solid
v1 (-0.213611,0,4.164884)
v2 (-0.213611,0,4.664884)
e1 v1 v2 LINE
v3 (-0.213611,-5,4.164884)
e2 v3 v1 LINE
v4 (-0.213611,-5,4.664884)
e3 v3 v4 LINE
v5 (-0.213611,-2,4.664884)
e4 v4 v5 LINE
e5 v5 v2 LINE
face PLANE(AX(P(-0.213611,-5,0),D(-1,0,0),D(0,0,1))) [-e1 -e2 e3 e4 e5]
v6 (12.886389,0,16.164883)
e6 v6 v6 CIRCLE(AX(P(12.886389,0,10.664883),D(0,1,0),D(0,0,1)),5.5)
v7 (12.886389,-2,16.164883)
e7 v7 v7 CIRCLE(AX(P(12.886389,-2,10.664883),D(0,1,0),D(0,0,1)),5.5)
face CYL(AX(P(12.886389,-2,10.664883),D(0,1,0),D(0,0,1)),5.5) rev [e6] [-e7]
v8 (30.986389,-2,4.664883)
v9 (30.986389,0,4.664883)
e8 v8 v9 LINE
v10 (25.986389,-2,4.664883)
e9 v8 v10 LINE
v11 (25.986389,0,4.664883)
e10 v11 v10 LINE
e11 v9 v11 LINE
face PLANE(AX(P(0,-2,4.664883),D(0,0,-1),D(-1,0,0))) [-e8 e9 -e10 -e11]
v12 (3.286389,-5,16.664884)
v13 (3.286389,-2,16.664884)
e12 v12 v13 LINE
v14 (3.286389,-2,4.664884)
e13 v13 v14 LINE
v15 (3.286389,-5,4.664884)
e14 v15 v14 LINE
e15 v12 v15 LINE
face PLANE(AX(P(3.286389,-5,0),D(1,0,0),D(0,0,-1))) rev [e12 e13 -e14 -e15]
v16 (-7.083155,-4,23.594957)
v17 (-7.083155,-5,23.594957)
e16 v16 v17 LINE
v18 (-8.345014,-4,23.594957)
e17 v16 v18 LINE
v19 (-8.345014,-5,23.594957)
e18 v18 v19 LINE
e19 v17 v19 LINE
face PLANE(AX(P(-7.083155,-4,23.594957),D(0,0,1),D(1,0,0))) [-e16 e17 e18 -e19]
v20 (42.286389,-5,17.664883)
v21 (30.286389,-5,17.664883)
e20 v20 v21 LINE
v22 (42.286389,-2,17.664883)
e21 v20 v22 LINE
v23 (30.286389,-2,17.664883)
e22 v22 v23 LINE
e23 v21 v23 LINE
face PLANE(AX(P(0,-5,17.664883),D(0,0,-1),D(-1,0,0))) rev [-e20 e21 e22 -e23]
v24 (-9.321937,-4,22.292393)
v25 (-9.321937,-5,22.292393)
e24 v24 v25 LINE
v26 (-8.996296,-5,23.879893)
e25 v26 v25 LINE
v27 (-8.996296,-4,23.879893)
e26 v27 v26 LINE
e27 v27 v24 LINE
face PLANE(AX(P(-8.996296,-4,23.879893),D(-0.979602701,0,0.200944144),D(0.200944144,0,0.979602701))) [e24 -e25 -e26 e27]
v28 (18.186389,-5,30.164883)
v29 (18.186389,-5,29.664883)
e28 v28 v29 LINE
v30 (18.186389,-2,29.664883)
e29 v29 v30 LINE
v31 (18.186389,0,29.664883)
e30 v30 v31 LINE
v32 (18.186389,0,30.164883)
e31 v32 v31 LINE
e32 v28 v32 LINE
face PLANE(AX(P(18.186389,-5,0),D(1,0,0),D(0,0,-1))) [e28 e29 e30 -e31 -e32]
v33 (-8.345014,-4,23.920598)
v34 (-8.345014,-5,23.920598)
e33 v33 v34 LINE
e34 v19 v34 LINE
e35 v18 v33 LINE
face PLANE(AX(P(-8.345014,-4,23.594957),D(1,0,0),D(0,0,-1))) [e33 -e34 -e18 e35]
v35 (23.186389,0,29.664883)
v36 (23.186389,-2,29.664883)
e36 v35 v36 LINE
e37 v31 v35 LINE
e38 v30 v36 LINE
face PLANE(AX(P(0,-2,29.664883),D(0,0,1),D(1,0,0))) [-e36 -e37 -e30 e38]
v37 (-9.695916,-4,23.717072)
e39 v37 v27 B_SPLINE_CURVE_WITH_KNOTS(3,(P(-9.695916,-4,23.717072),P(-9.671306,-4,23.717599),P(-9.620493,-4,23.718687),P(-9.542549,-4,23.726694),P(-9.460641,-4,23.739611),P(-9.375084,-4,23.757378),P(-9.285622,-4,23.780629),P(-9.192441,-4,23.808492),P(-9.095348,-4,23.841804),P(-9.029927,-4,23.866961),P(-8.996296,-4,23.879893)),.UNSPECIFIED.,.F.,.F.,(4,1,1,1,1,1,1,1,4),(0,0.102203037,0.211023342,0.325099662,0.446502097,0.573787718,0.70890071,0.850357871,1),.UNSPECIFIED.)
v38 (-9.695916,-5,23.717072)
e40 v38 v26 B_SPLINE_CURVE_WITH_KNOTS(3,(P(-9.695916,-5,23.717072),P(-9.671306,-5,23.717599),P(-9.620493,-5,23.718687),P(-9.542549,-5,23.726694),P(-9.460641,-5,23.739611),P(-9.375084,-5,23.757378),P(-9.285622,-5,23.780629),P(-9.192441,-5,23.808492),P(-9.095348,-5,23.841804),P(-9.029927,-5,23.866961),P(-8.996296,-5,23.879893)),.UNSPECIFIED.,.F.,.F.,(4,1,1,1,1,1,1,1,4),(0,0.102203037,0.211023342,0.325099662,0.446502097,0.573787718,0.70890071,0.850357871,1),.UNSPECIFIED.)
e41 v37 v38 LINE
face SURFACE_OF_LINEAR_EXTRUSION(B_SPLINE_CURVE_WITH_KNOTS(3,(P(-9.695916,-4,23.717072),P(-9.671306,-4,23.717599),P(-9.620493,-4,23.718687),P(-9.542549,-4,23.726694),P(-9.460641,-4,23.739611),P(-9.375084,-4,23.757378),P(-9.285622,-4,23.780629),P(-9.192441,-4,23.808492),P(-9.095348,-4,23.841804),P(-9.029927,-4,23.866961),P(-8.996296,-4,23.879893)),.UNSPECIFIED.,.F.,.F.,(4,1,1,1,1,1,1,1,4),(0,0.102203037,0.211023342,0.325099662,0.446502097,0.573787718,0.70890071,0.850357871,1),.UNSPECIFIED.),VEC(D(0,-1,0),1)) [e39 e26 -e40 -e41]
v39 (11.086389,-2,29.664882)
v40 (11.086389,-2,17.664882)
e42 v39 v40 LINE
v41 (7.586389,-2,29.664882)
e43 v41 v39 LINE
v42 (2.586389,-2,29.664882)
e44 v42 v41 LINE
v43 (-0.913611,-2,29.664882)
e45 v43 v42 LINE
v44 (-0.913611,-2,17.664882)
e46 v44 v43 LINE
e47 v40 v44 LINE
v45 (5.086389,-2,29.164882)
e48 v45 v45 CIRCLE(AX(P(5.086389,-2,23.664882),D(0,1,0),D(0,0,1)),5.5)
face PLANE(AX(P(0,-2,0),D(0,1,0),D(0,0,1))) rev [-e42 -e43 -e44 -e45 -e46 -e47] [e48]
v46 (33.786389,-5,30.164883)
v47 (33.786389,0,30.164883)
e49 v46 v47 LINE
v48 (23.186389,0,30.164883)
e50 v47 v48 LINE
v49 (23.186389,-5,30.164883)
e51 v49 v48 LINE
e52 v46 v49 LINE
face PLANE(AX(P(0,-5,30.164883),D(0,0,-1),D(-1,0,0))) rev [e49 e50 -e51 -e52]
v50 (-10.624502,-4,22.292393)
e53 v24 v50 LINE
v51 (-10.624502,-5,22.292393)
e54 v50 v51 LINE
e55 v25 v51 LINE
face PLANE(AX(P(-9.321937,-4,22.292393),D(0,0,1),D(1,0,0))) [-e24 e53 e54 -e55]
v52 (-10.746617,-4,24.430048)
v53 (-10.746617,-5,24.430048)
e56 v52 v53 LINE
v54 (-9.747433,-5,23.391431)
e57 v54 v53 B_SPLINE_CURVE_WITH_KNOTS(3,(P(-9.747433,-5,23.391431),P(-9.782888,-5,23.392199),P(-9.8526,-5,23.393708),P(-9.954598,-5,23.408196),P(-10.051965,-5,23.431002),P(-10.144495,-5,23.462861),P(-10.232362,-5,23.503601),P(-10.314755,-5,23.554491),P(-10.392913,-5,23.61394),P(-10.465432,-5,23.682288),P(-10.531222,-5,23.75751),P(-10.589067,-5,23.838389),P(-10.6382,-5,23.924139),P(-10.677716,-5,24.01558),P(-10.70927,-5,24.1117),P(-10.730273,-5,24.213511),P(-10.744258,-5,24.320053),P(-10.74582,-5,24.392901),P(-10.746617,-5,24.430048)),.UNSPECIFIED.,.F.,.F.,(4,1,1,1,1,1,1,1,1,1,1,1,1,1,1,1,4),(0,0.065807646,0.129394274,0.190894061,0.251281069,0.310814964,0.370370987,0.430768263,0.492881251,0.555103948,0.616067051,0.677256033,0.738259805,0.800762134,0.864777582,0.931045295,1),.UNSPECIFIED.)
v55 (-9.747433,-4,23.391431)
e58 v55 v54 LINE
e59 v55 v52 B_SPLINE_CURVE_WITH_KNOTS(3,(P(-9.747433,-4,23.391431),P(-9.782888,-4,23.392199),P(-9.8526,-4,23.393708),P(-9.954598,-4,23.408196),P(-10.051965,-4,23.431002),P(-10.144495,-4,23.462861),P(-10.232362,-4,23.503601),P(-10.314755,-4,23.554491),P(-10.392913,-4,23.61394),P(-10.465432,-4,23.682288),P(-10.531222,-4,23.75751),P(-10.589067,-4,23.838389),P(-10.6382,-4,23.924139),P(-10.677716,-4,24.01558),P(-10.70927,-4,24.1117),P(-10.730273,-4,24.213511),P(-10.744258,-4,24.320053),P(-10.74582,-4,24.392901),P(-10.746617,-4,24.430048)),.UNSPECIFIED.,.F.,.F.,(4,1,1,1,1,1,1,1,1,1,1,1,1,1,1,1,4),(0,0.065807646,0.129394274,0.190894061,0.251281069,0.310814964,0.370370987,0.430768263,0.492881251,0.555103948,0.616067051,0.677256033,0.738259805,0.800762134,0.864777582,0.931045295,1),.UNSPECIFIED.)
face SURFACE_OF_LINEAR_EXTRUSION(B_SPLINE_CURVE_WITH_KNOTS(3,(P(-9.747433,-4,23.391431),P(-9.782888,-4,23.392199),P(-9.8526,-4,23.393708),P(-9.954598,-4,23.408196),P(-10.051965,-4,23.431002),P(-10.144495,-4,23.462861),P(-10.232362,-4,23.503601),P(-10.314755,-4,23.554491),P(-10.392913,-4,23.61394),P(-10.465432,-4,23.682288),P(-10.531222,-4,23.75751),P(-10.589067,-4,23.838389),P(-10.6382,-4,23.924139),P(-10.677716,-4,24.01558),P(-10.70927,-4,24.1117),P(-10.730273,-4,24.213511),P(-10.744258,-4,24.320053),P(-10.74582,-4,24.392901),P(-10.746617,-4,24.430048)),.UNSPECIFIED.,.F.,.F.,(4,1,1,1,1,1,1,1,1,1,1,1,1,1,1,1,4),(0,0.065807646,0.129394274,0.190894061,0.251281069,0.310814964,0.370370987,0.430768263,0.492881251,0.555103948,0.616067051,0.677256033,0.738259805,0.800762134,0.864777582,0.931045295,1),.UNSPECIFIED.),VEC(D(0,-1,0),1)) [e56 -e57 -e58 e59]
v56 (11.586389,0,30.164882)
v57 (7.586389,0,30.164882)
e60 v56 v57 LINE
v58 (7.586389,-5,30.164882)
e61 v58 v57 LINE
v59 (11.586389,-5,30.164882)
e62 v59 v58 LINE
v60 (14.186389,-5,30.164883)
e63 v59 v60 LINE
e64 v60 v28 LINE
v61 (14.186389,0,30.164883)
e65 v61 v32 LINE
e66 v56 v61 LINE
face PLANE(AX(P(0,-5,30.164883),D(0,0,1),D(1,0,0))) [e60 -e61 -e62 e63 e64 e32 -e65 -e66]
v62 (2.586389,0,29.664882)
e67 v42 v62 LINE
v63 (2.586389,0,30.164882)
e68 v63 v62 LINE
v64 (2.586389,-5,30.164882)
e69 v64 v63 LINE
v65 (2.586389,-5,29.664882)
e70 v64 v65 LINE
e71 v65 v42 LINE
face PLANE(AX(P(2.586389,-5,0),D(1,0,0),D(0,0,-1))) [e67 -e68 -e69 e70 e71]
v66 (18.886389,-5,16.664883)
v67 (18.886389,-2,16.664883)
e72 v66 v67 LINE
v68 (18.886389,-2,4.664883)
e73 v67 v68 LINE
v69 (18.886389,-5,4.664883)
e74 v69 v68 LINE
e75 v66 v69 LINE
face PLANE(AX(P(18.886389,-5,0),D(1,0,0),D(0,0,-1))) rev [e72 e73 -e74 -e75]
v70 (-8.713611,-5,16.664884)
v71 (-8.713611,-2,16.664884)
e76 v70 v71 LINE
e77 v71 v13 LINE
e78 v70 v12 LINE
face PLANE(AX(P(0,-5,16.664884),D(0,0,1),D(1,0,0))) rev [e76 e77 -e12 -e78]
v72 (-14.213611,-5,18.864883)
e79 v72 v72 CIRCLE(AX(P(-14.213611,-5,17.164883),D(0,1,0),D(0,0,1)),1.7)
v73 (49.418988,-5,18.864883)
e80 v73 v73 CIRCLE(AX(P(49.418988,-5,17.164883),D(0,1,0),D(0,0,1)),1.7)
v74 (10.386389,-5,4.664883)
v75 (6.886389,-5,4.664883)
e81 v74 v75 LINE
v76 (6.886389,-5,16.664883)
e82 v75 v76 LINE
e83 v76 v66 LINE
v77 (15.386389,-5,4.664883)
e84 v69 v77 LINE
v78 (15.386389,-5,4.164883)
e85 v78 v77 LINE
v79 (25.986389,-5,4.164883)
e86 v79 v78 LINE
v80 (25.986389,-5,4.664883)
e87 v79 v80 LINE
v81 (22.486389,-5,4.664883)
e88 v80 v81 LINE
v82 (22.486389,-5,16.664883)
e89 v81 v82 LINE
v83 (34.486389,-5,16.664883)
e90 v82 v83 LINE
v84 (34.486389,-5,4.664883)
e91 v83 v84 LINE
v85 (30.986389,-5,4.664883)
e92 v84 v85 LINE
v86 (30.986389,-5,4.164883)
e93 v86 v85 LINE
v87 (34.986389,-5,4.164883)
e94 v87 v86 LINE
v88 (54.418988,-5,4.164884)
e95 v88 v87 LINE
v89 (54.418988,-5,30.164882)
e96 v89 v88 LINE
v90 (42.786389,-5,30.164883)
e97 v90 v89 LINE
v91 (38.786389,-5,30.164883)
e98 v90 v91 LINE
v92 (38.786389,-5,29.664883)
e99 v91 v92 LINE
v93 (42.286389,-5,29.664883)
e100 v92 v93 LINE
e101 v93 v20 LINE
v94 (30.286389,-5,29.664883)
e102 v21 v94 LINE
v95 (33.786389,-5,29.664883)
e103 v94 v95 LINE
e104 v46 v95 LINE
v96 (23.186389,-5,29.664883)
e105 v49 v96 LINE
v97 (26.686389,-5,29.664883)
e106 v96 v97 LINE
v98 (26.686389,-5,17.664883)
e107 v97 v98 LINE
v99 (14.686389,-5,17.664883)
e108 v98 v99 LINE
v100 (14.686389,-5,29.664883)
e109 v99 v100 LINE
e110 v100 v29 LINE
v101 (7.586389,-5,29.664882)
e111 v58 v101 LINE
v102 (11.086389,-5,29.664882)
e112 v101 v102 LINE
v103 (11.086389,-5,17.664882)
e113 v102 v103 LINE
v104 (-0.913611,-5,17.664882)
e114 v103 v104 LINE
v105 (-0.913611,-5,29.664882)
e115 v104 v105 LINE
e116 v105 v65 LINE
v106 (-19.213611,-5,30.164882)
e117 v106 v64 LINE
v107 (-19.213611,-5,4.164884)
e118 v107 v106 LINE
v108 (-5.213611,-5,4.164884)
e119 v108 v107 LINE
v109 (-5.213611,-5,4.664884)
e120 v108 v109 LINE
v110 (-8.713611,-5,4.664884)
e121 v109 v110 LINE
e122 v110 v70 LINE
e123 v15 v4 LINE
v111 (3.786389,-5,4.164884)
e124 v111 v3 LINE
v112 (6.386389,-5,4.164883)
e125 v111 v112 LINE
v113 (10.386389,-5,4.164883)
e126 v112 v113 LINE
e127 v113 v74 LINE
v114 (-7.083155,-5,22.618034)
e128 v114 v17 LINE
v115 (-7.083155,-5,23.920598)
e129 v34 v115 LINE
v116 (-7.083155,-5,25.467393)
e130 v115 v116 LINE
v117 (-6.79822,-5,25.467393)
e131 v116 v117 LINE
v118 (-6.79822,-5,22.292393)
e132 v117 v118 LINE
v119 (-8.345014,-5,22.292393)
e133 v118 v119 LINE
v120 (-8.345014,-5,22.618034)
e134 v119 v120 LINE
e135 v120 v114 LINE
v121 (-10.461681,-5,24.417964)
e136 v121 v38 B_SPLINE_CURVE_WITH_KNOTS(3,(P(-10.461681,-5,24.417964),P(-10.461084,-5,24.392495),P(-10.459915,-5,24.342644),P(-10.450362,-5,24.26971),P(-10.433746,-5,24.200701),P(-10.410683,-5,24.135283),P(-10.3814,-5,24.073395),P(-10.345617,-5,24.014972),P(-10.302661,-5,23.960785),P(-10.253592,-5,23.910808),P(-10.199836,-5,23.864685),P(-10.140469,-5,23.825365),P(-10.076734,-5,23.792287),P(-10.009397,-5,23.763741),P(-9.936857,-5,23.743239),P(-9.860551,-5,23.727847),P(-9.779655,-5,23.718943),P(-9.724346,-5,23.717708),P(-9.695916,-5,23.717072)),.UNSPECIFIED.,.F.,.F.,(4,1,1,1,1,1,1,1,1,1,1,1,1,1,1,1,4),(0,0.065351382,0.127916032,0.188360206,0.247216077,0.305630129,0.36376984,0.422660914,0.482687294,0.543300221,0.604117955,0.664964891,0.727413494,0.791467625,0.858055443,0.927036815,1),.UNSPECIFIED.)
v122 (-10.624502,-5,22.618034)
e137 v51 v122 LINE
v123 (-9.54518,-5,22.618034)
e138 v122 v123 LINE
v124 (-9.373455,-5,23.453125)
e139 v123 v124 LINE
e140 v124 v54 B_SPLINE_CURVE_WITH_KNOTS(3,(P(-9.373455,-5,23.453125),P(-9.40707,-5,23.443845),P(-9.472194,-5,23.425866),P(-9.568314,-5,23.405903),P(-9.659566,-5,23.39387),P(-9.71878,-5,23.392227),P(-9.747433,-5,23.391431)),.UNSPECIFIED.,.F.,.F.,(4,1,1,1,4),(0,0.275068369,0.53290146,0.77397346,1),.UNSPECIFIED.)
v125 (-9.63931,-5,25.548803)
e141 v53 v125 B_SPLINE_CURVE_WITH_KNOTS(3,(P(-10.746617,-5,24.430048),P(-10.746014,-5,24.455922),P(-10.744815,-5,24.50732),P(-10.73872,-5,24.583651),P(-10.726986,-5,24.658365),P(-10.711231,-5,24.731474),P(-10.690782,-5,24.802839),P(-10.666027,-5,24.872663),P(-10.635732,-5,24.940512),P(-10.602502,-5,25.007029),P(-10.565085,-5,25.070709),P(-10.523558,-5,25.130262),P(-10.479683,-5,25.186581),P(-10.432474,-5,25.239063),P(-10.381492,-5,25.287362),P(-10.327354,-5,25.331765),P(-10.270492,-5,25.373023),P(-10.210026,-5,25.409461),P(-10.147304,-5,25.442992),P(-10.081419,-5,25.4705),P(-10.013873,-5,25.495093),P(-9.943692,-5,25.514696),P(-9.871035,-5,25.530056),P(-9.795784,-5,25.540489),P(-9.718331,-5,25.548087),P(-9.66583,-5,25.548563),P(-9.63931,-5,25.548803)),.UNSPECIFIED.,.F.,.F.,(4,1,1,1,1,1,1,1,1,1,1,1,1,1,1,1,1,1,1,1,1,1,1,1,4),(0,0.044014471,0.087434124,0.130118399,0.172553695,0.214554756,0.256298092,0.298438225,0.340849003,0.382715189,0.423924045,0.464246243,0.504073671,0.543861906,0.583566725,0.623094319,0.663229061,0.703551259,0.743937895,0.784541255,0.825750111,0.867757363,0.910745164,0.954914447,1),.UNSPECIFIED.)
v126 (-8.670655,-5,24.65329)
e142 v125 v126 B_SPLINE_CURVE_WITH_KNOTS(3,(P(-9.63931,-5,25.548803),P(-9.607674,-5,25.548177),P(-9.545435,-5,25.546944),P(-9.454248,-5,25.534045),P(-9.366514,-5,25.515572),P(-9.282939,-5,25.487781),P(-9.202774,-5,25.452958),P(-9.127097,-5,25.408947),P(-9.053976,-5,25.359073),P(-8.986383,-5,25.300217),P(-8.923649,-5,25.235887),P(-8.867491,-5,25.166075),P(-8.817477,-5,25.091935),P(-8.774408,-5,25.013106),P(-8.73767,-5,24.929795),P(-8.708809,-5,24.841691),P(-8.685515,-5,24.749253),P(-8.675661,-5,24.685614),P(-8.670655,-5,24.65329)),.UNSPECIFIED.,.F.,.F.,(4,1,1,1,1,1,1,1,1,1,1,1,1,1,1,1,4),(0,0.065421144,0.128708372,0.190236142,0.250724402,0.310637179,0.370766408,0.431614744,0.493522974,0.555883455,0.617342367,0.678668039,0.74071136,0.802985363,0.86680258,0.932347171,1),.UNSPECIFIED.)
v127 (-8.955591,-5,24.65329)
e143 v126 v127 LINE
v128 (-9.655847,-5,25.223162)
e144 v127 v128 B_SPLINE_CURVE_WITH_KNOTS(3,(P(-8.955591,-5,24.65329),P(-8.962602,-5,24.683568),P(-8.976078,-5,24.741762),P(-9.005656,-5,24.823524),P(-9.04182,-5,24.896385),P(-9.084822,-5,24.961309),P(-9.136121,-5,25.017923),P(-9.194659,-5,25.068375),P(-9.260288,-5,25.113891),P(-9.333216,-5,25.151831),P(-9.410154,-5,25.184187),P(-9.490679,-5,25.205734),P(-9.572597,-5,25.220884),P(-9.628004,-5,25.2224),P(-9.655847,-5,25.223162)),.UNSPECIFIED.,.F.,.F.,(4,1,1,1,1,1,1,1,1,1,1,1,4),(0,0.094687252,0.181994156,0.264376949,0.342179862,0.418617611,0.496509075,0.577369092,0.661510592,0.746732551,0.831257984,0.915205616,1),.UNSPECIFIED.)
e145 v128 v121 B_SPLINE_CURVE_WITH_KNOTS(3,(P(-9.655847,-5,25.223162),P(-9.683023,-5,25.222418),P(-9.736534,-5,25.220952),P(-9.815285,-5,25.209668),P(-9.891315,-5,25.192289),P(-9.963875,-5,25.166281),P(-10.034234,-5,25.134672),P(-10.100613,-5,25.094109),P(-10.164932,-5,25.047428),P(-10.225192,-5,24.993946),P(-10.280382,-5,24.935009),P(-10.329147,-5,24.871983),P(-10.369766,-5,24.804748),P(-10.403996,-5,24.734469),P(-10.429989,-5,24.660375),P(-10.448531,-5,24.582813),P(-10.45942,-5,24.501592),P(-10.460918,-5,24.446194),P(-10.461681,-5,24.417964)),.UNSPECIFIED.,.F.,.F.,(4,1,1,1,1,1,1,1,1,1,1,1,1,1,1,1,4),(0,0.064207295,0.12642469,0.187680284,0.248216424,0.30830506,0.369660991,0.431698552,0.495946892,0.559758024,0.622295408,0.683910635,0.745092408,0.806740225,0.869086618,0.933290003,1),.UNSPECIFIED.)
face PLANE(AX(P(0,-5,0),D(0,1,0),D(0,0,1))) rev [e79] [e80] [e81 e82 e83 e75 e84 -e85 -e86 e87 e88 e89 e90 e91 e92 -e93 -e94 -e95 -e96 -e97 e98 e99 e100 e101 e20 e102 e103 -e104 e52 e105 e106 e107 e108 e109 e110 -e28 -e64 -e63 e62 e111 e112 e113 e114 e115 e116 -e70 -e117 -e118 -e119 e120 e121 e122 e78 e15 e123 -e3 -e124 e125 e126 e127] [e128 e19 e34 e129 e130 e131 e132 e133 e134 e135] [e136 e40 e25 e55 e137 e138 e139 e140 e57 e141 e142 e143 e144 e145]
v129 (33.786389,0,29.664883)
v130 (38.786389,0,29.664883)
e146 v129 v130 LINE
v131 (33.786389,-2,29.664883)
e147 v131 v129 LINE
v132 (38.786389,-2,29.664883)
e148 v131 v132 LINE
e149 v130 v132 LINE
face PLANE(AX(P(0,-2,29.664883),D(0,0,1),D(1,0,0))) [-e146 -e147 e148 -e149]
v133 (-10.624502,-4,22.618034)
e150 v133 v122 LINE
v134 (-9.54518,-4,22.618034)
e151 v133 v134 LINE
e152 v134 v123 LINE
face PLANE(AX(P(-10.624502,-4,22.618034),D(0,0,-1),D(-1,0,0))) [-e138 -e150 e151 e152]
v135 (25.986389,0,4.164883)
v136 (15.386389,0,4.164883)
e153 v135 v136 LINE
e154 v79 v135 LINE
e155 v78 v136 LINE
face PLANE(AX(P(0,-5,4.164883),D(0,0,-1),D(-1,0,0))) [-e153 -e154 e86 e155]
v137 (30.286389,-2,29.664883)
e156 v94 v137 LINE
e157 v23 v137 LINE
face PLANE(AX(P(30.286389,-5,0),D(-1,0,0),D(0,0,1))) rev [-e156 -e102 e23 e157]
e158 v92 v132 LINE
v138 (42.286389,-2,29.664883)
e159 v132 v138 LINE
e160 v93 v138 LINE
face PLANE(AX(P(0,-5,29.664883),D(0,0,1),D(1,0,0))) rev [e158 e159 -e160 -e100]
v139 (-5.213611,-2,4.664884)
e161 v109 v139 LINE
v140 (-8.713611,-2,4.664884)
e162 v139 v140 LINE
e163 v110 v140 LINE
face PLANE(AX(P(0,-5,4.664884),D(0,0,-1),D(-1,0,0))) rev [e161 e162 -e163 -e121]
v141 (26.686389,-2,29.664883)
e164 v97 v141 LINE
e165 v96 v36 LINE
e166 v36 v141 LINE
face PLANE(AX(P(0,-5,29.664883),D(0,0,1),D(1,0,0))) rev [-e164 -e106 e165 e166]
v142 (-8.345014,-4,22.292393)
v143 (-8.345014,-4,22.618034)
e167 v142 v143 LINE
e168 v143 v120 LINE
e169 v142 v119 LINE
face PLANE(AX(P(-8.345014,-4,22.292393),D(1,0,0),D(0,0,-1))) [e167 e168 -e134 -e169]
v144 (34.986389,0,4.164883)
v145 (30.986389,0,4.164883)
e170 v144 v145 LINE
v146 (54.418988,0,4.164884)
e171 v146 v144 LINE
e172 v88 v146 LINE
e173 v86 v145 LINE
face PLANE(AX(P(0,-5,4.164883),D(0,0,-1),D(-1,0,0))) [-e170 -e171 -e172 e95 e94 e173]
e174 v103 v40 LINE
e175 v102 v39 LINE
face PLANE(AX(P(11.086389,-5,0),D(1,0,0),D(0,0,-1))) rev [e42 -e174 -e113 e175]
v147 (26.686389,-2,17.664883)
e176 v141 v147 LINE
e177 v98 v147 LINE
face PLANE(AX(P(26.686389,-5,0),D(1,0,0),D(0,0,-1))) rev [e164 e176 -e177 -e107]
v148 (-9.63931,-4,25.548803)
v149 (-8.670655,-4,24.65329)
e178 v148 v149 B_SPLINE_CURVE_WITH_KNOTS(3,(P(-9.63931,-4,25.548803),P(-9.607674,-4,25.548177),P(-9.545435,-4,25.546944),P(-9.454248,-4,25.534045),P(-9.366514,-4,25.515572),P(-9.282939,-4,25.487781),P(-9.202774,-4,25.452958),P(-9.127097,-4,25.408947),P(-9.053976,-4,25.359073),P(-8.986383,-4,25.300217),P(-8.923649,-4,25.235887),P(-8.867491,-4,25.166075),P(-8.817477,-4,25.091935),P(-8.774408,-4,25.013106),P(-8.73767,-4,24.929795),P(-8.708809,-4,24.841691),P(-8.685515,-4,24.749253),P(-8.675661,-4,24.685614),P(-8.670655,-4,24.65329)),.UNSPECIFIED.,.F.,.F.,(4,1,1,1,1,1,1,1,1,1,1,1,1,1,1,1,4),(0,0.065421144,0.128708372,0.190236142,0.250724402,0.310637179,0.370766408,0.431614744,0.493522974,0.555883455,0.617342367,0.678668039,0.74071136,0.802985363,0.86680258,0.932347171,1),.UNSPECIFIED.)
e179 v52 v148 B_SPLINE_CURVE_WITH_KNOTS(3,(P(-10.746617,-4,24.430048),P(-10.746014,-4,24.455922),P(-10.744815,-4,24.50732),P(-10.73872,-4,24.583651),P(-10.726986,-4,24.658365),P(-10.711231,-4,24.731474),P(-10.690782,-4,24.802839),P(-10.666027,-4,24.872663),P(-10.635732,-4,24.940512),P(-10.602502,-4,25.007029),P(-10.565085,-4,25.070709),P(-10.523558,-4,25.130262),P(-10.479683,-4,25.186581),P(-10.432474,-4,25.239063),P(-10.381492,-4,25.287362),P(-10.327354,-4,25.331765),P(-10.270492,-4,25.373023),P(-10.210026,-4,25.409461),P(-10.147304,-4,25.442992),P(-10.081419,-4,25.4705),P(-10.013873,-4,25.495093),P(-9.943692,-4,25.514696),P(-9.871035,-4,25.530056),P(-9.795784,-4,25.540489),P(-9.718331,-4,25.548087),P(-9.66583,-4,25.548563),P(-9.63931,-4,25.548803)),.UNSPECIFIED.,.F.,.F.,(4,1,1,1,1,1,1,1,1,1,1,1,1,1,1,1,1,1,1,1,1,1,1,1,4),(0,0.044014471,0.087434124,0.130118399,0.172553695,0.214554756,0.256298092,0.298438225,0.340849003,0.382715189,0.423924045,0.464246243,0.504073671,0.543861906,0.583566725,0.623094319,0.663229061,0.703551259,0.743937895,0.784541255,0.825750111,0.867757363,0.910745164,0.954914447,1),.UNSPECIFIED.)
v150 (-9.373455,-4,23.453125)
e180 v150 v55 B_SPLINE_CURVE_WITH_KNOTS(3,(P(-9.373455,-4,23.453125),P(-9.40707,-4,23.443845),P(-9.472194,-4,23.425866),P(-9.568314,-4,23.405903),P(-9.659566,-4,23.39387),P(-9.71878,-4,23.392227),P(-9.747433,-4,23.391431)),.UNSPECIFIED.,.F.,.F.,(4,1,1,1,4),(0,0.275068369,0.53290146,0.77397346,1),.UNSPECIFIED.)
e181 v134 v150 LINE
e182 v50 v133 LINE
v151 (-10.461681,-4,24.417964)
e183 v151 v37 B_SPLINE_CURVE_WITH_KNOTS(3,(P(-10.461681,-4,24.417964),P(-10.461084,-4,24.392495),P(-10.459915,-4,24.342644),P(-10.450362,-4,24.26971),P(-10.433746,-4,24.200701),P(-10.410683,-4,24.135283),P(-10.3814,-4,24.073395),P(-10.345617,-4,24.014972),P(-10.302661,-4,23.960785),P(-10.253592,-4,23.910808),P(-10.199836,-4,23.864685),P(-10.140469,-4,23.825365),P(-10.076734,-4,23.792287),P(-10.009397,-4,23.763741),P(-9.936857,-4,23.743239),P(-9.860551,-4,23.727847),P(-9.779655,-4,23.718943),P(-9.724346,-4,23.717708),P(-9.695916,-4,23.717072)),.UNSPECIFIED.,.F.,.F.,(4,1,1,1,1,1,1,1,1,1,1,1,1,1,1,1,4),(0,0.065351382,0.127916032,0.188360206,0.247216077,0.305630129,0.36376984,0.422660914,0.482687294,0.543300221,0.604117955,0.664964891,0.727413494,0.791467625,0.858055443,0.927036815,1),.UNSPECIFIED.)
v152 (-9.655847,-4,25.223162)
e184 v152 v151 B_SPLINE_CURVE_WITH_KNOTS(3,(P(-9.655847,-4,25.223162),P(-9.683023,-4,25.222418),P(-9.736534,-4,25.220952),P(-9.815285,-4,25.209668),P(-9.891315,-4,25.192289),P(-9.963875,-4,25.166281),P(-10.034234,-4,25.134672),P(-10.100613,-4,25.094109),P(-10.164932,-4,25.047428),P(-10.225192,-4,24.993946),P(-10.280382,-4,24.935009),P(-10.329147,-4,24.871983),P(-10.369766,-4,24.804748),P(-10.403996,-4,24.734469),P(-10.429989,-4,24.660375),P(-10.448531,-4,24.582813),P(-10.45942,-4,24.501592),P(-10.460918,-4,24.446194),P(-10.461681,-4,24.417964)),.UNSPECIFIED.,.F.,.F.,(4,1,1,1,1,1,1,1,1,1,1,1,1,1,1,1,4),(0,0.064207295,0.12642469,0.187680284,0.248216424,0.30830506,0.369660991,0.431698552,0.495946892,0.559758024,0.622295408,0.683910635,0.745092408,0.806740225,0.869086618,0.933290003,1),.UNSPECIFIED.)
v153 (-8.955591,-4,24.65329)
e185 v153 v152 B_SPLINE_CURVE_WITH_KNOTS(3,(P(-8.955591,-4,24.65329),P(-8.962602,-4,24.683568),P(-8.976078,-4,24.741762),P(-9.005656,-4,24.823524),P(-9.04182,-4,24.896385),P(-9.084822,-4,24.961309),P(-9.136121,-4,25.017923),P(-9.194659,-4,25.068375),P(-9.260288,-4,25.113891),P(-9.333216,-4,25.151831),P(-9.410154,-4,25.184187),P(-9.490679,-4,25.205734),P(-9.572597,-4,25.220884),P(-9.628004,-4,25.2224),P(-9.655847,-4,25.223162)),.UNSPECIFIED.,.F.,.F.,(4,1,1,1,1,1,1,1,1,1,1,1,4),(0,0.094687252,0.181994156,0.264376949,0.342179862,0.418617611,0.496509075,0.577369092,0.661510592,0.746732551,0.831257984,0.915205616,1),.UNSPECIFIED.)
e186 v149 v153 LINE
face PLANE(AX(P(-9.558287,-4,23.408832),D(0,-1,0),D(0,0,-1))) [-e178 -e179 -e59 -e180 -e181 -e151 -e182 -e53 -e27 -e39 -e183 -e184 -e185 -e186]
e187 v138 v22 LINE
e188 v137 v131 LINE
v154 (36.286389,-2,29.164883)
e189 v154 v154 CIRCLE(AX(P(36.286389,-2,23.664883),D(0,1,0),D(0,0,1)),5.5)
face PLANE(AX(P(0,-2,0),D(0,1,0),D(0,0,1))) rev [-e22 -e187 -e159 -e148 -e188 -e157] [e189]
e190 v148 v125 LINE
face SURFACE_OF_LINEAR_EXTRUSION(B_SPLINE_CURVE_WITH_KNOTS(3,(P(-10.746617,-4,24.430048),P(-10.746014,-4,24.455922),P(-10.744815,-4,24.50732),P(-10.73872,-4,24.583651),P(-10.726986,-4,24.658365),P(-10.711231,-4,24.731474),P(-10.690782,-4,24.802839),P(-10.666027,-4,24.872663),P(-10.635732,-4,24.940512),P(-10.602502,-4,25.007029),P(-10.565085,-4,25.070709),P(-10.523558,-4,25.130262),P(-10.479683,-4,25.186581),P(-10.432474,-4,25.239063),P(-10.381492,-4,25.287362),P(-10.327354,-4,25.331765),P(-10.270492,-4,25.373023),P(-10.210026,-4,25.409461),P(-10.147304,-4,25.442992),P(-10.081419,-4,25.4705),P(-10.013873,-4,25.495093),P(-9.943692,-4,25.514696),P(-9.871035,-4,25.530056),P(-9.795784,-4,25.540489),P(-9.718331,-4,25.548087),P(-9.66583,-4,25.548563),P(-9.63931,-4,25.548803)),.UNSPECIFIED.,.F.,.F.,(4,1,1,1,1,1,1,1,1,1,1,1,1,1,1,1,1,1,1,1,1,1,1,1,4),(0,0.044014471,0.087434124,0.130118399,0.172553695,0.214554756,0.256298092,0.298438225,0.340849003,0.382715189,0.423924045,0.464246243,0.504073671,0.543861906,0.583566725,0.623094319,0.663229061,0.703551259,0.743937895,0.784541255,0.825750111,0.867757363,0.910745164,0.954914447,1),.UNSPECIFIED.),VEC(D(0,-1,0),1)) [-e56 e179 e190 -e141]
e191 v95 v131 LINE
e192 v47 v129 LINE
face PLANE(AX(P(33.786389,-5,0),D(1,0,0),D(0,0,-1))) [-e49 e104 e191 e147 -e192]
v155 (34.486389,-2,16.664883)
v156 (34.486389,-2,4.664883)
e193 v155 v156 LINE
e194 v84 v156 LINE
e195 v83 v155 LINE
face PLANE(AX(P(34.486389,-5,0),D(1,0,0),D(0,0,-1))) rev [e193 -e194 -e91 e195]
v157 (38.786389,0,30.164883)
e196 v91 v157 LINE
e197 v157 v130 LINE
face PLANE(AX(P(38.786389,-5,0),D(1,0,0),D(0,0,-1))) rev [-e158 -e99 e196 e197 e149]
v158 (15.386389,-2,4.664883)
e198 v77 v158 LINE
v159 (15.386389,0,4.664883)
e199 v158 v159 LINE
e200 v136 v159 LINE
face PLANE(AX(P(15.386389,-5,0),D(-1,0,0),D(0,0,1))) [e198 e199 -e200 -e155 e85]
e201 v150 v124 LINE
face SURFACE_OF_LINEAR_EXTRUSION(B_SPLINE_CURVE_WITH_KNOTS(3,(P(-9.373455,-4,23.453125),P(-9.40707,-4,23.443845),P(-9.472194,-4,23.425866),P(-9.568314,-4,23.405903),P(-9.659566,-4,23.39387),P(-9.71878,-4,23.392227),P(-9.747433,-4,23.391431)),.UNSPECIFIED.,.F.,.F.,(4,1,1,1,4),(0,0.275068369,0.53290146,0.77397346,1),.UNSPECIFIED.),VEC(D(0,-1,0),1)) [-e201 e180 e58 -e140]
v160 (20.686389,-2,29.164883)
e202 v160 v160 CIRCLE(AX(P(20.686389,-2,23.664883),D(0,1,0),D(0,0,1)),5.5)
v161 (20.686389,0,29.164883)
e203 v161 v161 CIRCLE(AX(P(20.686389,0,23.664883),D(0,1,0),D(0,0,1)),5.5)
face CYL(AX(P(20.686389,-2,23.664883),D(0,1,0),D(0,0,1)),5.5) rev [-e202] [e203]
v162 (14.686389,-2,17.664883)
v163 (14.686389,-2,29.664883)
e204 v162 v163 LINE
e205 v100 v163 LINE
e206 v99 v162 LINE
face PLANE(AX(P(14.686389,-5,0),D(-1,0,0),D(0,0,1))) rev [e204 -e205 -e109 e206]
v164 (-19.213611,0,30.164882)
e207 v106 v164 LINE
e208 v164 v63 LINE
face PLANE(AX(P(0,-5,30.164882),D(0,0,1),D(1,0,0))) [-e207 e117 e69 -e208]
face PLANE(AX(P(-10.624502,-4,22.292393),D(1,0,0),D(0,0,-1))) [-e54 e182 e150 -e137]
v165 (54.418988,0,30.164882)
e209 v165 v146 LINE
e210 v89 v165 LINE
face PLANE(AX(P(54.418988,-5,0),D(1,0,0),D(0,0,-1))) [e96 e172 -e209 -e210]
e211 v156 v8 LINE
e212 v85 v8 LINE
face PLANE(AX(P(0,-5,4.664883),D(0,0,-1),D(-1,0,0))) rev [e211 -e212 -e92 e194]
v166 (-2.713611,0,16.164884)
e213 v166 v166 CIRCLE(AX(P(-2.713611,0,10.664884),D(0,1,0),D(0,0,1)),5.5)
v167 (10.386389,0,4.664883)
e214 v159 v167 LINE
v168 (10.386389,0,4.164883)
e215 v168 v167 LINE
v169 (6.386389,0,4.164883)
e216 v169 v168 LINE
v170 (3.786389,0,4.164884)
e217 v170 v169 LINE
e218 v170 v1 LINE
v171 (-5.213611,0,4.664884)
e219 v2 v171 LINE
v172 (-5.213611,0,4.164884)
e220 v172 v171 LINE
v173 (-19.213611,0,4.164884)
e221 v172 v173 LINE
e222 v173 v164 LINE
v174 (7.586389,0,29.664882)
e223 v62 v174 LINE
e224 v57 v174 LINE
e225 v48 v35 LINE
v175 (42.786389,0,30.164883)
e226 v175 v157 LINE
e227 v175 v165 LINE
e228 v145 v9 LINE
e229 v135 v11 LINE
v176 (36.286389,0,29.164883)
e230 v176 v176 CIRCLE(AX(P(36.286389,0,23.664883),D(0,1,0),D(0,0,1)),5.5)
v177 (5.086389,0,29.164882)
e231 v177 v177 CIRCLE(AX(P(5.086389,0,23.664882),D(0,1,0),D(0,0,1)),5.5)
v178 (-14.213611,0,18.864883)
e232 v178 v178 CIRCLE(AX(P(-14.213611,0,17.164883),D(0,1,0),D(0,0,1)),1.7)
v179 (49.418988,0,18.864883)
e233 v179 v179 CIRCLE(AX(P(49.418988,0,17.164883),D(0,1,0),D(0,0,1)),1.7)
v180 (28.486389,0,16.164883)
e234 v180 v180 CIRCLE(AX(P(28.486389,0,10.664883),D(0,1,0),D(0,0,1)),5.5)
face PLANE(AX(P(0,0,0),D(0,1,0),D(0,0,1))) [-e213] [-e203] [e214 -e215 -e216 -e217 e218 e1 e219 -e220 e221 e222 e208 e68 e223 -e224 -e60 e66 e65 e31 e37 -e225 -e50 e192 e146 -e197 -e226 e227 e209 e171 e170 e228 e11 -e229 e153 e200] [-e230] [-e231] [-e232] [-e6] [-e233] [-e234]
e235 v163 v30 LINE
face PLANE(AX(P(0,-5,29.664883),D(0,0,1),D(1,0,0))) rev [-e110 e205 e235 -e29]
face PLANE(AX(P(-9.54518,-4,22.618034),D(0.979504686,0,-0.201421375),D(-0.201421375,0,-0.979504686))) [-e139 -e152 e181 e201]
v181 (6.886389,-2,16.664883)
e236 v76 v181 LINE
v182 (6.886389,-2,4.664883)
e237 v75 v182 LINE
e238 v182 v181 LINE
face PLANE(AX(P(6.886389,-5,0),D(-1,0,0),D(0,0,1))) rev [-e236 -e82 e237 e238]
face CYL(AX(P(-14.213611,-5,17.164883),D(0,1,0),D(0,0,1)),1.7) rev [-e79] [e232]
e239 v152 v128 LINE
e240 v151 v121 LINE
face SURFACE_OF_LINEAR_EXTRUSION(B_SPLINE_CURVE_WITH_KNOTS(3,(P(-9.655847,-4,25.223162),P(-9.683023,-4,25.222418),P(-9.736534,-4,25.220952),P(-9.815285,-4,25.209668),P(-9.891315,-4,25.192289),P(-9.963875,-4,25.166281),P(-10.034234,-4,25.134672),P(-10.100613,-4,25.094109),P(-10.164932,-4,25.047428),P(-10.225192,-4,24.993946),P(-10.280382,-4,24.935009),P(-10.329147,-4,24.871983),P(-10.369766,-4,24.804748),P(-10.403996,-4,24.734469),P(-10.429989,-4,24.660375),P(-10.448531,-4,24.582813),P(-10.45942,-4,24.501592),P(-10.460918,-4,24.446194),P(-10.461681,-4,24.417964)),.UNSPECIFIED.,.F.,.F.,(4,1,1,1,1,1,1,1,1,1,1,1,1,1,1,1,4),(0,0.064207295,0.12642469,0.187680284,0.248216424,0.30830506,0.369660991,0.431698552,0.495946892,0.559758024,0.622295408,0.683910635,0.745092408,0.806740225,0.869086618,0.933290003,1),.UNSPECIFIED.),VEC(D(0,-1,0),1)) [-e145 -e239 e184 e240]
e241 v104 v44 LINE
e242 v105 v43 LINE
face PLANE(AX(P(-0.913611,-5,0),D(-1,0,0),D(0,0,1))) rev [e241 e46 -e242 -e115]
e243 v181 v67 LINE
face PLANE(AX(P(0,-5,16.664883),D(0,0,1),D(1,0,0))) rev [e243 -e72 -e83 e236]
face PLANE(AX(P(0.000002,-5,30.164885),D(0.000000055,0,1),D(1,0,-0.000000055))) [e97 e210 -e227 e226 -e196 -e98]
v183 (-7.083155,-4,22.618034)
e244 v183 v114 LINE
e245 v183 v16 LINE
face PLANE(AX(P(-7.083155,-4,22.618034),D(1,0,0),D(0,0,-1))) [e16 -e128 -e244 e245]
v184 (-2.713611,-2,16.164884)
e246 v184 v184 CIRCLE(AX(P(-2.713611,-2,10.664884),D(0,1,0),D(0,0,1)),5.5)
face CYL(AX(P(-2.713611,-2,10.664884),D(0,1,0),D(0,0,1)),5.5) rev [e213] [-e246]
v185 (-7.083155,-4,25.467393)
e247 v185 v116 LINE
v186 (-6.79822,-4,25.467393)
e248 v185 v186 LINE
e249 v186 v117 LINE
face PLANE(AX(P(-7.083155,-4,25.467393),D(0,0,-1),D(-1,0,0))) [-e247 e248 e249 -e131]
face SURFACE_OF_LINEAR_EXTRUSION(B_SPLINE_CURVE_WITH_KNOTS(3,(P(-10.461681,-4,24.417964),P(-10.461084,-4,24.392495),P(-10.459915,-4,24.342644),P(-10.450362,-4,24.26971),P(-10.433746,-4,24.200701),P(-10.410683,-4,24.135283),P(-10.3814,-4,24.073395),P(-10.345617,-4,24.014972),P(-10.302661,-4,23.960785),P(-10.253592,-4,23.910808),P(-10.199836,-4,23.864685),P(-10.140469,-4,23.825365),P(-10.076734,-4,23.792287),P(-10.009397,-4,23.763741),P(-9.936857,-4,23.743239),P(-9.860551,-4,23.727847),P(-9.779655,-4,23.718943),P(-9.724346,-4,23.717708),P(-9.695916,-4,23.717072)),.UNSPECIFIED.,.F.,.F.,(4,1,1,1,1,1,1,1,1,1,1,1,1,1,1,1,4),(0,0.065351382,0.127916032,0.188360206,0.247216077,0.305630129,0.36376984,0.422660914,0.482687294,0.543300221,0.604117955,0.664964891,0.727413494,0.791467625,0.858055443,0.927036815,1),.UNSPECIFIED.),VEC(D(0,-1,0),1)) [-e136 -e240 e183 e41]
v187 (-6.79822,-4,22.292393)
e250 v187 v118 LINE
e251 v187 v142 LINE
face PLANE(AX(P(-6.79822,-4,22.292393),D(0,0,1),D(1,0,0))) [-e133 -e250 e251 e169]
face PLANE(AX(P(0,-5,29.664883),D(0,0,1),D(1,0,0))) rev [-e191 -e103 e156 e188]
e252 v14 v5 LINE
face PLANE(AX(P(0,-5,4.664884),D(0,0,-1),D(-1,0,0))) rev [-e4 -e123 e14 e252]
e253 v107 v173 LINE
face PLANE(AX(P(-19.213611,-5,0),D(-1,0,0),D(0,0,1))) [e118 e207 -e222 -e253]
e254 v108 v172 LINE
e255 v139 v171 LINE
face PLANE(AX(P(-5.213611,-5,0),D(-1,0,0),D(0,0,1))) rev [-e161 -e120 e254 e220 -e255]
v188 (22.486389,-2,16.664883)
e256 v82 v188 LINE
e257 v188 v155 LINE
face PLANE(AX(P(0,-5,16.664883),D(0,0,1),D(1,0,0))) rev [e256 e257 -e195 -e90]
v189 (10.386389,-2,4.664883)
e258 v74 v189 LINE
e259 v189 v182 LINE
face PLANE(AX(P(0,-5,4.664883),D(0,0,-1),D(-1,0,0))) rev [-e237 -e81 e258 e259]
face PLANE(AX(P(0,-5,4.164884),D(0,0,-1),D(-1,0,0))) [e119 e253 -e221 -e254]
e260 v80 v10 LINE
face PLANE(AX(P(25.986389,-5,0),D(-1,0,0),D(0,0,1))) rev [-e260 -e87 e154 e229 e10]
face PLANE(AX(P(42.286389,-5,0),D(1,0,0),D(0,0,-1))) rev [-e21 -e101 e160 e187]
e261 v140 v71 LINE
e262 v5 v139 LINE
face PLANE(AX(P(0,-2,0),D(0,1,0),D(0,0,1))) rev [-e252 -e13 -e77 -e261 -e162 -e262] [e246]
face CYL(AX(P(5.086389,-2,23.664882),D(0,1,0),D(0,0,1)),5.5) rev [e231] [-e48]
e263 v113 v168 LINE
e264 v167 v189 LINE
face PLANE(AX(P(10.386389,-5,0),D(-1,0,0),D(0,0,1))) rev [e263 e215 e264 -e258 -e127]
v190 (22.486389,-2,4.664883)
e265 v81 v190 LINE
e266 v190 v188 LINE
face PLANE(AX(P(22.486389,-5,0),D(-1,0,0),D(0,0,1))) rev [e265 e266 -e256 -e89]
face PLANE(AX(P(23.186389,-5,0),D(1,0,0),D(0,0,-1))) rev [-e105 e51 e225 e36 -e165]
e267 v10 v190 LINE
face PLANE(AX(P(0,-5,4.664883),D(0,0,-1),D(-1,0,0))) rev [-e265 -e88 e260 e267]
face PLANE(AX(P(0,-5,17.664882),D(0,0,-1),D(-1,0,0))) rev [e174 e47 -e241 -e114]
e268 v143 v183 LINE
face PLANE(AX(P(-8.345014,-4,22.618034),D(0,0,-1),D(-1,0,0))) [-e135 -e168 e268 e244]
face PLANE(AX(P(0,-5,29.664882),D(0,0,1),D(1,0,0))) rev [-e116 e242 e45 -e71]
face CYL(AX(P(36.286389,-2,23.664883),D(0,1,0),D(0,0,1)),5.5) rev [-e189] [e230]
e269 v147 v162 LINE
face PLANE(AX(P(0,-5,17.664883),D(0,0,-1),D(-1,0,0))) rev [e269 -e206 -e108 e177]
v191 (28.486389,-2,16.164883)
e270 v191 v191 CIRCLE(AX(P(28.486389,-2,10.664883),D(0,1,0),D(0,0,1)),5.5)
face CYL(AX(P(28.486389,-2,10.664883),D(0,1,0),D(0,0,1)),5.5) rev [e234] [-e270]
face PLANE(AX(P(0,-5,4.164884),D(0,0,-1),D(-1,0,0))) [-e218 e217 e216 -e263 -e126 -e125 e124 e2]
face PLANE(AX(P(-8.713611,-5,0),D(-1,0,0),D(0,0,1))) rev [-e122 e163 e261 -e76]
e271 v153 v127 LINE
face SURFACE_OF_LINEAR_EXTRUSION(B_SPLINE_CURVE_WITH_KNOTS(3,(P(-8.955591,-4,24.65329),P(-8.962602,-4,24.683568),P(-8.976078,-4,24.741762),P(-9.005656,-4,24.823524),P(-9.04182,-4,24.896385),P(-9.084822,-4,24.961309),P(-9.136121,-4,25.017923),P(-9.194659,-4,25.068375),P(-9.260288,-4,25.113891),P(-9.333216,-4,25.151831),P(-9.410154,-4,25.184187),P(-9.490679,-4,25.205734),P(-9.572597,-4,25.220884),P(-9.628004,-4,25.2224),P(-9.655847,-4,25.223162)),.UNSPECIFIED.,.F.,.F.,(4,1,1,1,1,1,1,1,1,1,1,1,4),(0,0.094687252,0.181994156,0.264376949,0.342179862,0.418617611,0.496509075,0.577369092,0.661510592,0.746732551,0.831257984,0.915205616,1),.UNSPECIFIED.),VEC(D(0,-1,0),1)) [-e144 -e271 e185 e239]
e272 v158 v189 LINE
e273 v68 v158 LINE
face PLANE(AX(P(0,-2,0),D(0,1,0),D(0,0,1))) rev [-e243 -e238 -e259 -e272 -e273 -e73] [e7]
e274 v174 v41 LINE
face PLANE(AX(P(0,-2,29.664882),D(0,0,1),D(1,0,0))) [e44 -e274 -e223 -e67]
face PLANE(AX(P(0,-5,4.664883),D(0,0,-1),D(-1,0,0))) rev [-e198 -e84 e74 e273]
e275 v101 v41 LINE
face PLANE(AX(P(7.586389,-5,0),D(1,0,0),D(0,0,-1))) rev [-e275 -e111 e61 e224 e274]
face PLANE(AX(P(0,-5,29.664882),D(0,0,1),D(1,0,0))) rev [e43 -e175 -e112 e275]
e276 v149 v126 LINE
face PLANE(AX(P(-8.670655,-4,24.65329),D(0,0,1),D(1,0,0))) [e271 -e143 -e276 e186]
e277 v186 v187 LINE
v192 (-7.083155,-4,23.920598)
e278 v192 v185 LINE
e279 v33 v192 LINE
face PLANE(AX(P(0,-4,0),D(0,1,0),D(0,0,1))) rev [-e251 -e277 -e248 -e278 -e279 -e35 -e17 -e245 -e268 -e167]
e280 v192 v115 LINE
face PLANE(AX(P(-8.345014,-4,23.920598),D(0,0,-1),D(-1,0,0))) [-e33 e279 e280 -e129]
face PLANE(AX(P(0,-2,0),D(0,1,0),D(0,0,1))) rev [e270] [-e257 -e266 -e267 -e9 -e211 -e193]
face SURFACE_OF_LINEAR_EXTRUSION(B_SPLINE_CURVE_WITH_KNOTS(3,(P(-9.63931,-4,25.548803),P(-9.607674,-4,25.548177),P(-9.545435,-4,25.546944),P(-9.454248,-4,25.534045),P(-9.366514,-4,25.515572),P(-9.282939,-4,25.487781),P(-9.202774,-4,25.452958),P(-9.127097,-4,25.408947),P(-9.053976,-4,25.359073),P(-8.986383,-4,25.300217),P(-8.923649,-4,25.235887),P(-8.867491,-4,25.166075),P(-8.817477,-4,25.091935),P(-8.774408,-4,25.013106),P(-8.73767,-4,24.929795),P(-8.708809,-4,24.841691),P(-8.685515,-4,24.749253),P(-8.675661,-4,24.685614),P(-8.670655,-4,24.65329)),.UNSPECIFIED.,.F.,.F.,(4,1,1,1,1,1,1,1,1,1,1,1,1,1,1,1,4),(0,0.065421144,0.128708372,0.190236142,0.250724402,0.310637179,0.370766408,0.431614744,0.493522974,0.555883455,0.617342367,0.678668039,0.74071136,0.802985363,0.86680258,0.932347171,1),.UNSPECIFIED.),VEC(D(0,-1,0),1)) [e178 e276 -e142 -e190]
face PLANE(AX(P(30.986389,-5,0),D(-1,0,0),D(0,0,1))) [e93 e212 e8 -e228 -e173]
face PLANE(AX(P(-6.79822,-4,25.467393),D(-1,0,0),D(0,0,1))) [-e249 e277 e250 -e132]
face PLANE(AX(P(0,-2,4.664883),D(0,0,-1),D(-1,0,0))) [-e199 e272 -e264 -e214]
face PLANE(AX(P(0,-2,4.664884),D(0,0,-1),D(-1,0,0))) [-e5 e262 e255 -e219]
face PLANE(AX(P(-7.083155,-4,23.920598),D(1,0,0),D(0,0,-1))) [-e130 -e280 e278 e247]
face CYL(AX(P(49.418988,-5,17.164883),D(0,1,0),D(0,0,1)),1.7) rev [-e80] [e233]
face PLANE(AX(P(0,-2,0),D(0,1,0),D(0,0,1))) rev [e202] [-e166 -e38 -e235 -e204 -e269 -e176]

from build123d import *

# Parameters (mm, degrees)
SKETCH1_W             = 12
SKETCH1_H             = 12
SKETCH1_R             = 5.5
BOSS_EXTRUDE1_DEPTH   = 2
BOSS_EXTRUDE1_2_DEPTH = 2
BOSS_EXTRUDE1_3_DEPTH = 2
BOSS_EXTRUDE1_4_DEPTH = 2
BOSS_EXTRUDE1_5_DEPTH = 2
BOSS_EXTRUDE1_6_DEPTH = 2
SKETCH1_3_R           = 1.7
BOSS_EXTRUDE2_DEPTH   = 5
CUT_EXTRUDE1_DEPTH    = 1


with BuildPart() as part:
    # Sketch1 → Boss-Extrude1 (new body)
    with BuildSketch(Plane(origin=(0, 0, 0), x_dir=(1, 0, 0), z_dir=(0, 1, 0))):
        with Locations((-2.713611414, -10.664883528)):
            Rectangle(SKETCH1_W, SKETCH1_H)
        with Locations((-2.713611414, -10.664883528)):
            Circle(SKETCH1_R, mode=Mode.SUBTRACT)
    extrude(amount=-BOSS_EXTRUDE1_DEPTH)



with BuildPart() as body_2:
    # Sketch1 → Boss-Extrude1 2 (new body)
    with BuildSketch(Plane(origin=(0, 0, 0), x_dir=(1, 0, 0), z_dir=(0, 1, 0))):
        with Locations((12.886388586, -10.664882884)):
            Rectangle(SKETCH1_W, SKETCH1_H)
        with Locations((12.886388586, -10.664882884)):
            Circle(SKETCH1_R, mode=Mode.SUBTRACT)
    extrude(amount=-BOSS_EXTRUDE1_2_DEPTH)


with BuildPart() as body_3:
    # Sketch1 → Boss-Extrude1 3 (new body)
    with BuildSketch(Plane(origin=(0, 0, 0), x_dir=(1, 0, 0), z_dir=(0, 1, 0))):
        with Locations((5.086388588, -23.66488245)):
            Rectangle(SKETCH1_W, SKETCH1_H)
        with Locations((5.086388588, -23.66488245)):
            Circle(SKETCH1_R, mode=Mode.SUBTRACT)
    extrude(amount=-BOSS_EXTRUDE1_3_DEPTH)


with BuildPart() as body_4:
    # Sketch1 → Boss-Extrude1 4 (new body)
    with BuildSketch(Plane(origin=(0, 0, 0), x_dir=(1, 0, 0), z_dir=(0, 1, 0))):
        with Locations((20.686388588, -23.664882884)):
            Rectangle(SKETCH1_W, SKETCH1_H)
        with Locations((20.686388588, -23.664882884)):
            Circle(SKETCH1_R, mode=Mode.SUBTRACT)
    extrude(amount=-BOSS_EXTRUDE1_4_DEPTH)


with BuildPart() as body_5:
    # Sketch1 → Boss-Extrude1 5 (new body)
    with BuildSketch(Plane(origin=(0, 0, 0), x_dir=(1, 0, 0), z_dir=(0, 1, 0))):
        with Locations((28.486388586, -10.664882884)):
            Rectangle(SKETCH1_W, SKETCH1_H)
        with Locations((28.486388586, -10.664882884)):
            Circle(SKETCH1_R, mode=Mode.SUBTRACT)
    extrude(amount=-BOSS_EXTRUDE1_5_DEPTH)


with BuildPart() as body_6:
    # Sketch1 → Boss-Extrude1 6 (new body)
    with BuildSketch(Plane(origin=(0, 0, 0), x_dir=(1, 0, 0), z_dir=(0, 1, 0))):
        with Locations((36.286388588, -23.664883087)):
            Rectangle(SKETCH1_W, SKETCH1_H)
        with Locations((36.286388588, -23.664883087)):
            Circle(SKETCH1_R, mode=Mode.SUBTRACT)
    extrude(amount=-BOSS_EXTRUDE1_6_DEPTH)


with BuildPart() as part_1:
    add(part.part)

    add(body_2.part)  # Boss-Extrude2 merges body 2

    add(body_3.part)  # Boss-Extrude2 merges body 3

    add(body_4.part)  # Boss-Extrude2 merges body 4

    add(body_5.part)  # Boss-Extrude2 merges body 5

    add(body_6.part)  # Boss-Extrude2 merges body 6
    # Sketch1<3> → Boss-Extrude2 (add)
    with BuildSketch(Plane(origin=(0, 0, 0), x_dir=(1, 0, 0), z_dir=(0, 1, 0))):
        Polygon((6.386388586, -4.164882884), (3.786388586, -4.164883528), (-0.213611414, -4.164883528), (-0.213611414, -4.664883528), (3.286388586, -4.664883528), (3.286388586, -16.664883528), (-8.713611414, -16.664883528), (-8.713611414, -4.664883528), (-5.213611414, -4.664883528), (-5.213611414, -4.164883528), (-19.213611414, -4.164883528), (-19.213611414, -30.16488245), (2.586388588, -30.16488245), (2.586388588, -29.66488245), (-0.913611412, -29.66488245), (-0.913611412, -17.66488245), (11.086388588, -17.66488245), (11.086388588, -29.66488245), (7.586388588, -29.66488245), (7.586388588, -30.16488245), (11.586388588, -30.16488245), (14.186388588, -30.164882884), (18.186388588, -30.164882884), (18.186388588, -29.664882884), (14.686388588, -29.664882884), (14.686388588, -17.664882884), (26.686388588, -17.664882884), (26.686388588, -29.664882884), (23.186388588, -29.664882884), (23.186388588, -30.164882884), (27.186388588, -30.164882884), (29.786388588, -30.164883087), (33.786388588, -30.164883087), (33.786388588, -29.664883087), (30.286388588, -29.664883087), (30.286388588, -17.664883087), (42.286388588, -17.664883087), (42.286388588, -29.664883087), (38.786388588, -29.664883087), (38.786388588, -30.164883087), (42.786388588, -30.164883087), (54.418988347, -30.16488245), (54.418988347, -4.164883528), (34.986388586, -4.164882884), (30.986388586, -4.164882884), (30.986388586, -4.664882884), (34.486388586, -4.664882884), (34.486388586, -16.664882884), (22.486388586, -16.664882884), (22.486388586, -4.664882884), (25.986388586, -4.664882884), (25.986388586, -4.164882884), (15.386388586, -4.164882884), (15.386388586, -4.664882884), (18.886388586, -4.664882884), (18.886388586, -16.664882884), (6.886388586, -16.664882884), (6.886388586, -4.664882884), (10.386388586, -4.664882884), (10.386388586, -4.164882884), align=None)
        with Locations((-14.213611414, -17.164882989)):
            Circle(SKETCH1_3_R, mode=Mode.SUBTRACT)
        with Locations((49.418988347, -17.164882989)):
            Circle(SKETCH1_3_R, mode=Mode.SUBTRACT)
    extrude(amount=-BOSS_EXTRUDE2_DEPTH)

    # Sketch2 → Cut-Extrude1 (cut)
    with BuildSketch(Plane(origin=(0, -5, 0), x_dir=(-1, 0, 0), z_dir=(0, -1, 0))):
        Polygon((6.798219501, -22.292392997), (8.345014372, -22.292392997), (8.345014372, -22.618034023), (7.083155398, -22.618034023), (7.083155398, -23.5949571), (8.345014372, -23.5949571), (8.345014372, -23.920598125), (7.083155398, -23.920598125), (7.083155398, -25.467392997), (6.798219501, -25.467392997), align=None)
        with BuildLine():
            Line((10.624501552, -22.292392997), (10.624501552, -22.618034023))
            Line((10.624501552, -22.618034023), (9.545179637, -22.618034023))
            Line((9.545179637, -22.618034023), (9.373454877, -23.453125169))
            add(Edge.make_bspline(
                [(9.373454877, -23.453125169), (9.407069849, -23.443844851), (9.47219354, -23.425865702), (9.568314271, -23.405903325), (9.65956577, -23.393869672), (9.718779856, -23.392226555), (9.747433243, -23.391431459)],
                knots=[0, 0, 0, 0, 1.100273476, 2.13160584, 3.095893838, 4, 4, 4, 4], degree=3))
            add(Edge.make_bspline(
                [(9.747433243, -23.391431459), (9.782887778, -23.392198843), (9.852600253, -23.393707713), (9.95459844, -23.408196462), (10.051964708, -23.431001956), (10.144495429, -23.462861287), (10.232361786, -23.50360083), (10.314755359, -23.55449149), (10.392912895, -23.613939584), (10.465432248, -23.682288273), (10.531222156, -23.757510025), (10.589067018, -23.838388951), (10.638200225, -23.924139045), (10.677716053, -24.015579597), (10.709270413, -24.111699686), (10.73027258, -24.213510672), (10.744257737, -24.320052895), (10.745820188, -24.392900612), (10.746616936, -24.430048246)],
                knots=[0, 0, 0, 0, 1.052922333, 2.070308379, 3.05430497, 4.020497103, 4.973039431, 5.925935799, 6.892292201, 7.88610001, 8.88166317, 9.857072816, 10.836096531, 11.812156883, 12.81219415, 13.836441305, 14.89672472, 16, 16, 16, 16], degree=3))
            add(Edge.make_bspline(
                [(10.746616936, -24.430048246), (10.746013618, -24.455921974), (10.744815135, -24.50731977), (10.738720416, -24.583650581), (10.726985874, -24.658365436), (10.711230867, -24.731474249), (10.690781673, -24.802838608), (10.666026603, -24.87266278), (10.635731635, -24.940512173), (10.602501745, -25.007028781), (10.565085297, -25.070708856), (10.523557651, -25.130261865), (10.479683241, -25.186581177), (10.43247427, -25.239062778), (10.381491939, -25.287361801), (10.327353683, -25.331764885), (10.270491502, -25.373022949), (10.210025675, -25.409461241), (10.147303566, -25.442991922), (10.081419397, -25.470499703), (10.013872905, -25.495092824), (9.94369191, -25.514695753), (9.87103538, -25.530055999), (9.795783548, -25.540488687), (9.718331083, -25.548087312), (9.665830179, -25.548562979), (9.639310246, -25.548803254)],
                knots=[0, 0, 0, 0, 1.056347294, 2.098418968, 3.122841568, 4.141288669, 5.149314143, 6.15115421, 7.162517403, 8.180376062, 9.185164535, 10.17417709, 11.141909838, 12.097768115, 13.052685741, 14.0056014, 14.954263652, 15.917497458, 16.885230207, 17.854509472, 18.828990115, 19.81800267, 20.826176721, 21.857883937, 22.917946725, 24, 24, 24, 24], degree=3))
            add(Edge.make_bspline(
                [(9.639310246, -25.548803254), (9.607674382, -25.548176565), (9.545434557, -25.546943629), (9.454248042, -25.534045431), (9.366514079, -25.51557245), (9.282938915, -25.487780977), (9.202773555, -25.452958217), (9.127097232, -25.408947118), (9.053976278, -25.359073217), (8.986383216, -25.300217468), (8.923648742, -25.235886814), (8.867490695, -25.166075239), (8.817476664, -25.09193496), (8.774407565, -25.01310592), (8.737670075, -24.929795253), (8.708809335, -24.841690816), (8.685515399, -24.749252955), (8.675660725, -24.685613699), (8.670655398, -24.653290433)],
                knots=[0, 0, 0, 0, 1.0467383, 2.05933395, 3.04377827, 4.011590433, 4.970194871, 5.932262533, 6.905835911, 7.896367577, 8.894135286, 9.877477877, 10.858688626, 11.851381753, 12.8477658, 13.868841284, 14.917554742, 16, 16, 16, 16], degree=3))
            Line((8.670655398, -24.653290433), (8.955591295, -24.653290433))
            add(Edge.make_bspline(
                [(8.955591295, -24.653290433), (8.962602201, -24.683567644), (8.976077551, -24.741762123), (9.005655623, -24.823524126), (9.041819667, -24.896385136), (9.084822183, -24.961308972), (9.13612114, -25.017922848), (9.19465855, -25.068375469), (9.26028827, -25.113891479), (9.333216414, -25.151830703), (9.410153993, -25.184187358), (9.490678534, -25.205733539), (9.572597477, -25.220883634), (9.628004284, -25.22240016), (9.655846704, -25.223162228)],
                knots=[0, 0, 0, 0, 1.136247022, 2.183929868, 3.172523383, 4.106158343, 5.02341133, 5.958108904, 6.928429099, 7.938127109, 8.96079061, 9.975095812, 10.982467395, 12, 12, 12, 12], degree=3))
            add(Edge.make_bspline(
                [(9.655846704, -25.223162228), (9.683023293, -25.222417665), (9.736534219, -25.220951615), (9.815284548, -25.209667654), (9.891314798, -25.192289), (9.963874758, -25.166281346), (10.034234154, -25.134672208), (10.100613217, -25.094109247), (10.164932256, -25.047427659), (10.225192063, -24.993945573), (10.280382135, -24.935008778), (10.329146616, -24.871982857), (10.369765673, -24.804748289), (10.4039959, -24.734469072), (10.429988536, -24.660374952), (10.448531426, -24.582813172), (10.459419915, -24.501592154), (10.460917771, -24.446193566), (10.461681039, -24.417963911)],
                knots=[0, 0, 0, 0, 1.027316725, 2.022795036, 3.002884548, 3.971462791, 4.93288096, 5.914575861, 6.907176829, 7.935150275, 8.956128384, 9.956726525, 10.942570165, 11.921478529, 12.907843606, 13.90538589, 14.932640048, 16, 16, 16, 16], degree=3))
            add(Edge.make_bspline(
                [(10.461681039, -24.417963911), (10.461083704, -24.392495193), (10.459914506, -24.342643802), (10.450361774, -24.269710237), (10.433745664, -24.20070112), (10.410682573, -24.135283207), (10.381400448, -24.073394799), (10.345617007, -24.014972023), (10.302660711, -23.960784903), (10.25359164, -23.910808086), (10.199836132, -23.864684521), (10.140469308, -23.825365243), (10.076733517, -23.79228726), (10.009396666, -23.76374129), (9.93685708, -23.743239186), (9.860551277, -23.72784689), (9.779655264, -23.718942953), (9.72434614, -23.717707526), (9.695915815, -23.717072484)],
                knots=[0, 0, 0, 0, 1.045622112, 2.046656509, 3.013763289, 3.955457236, 4.890082067, 5.820317437, 6.762574623, 7.722996705, 8.69280354, 9.665887285, 10.63943826, 11.638615906, 12.663482002, 13.728887084, 14.832589034, 16, 16, 16, 16], degree=3))
            add(Edge.make_bspline(
                [(9.695915815, -23.717072484), (9.671306001, -23.717599164), (9.620492978, -23.718686622), (9.5425487, -23.726693516), (9.460641208, -23.73961059), (9.375084487, -23.757378115), (9.285621598, -23.780629163), (9.192441334, -23.808491603), (9.095347778, -23.841803701), (9.0299267, -23.866960781), (8.996296424, -23.879892997)],
                knots=[0, 0, 0, 0, 0.817624296, 1.688186739, 2.600797293, 3.572016777, 4.590301741, 5.671205678, 6.80286297, 8, 8, 8, 8], degree=3))
            Line((8.996296424, -23.879892997), (9.321937449, -22.292392997))
            Line((9.321937449, -22.292392997), (10.624501552, -22.292392997))
        make_face()
    extrude(amount=-CUT_EXTRUDE1_DEPTH, mode=Mode.SUBTRACT)


solid = part_1.part
